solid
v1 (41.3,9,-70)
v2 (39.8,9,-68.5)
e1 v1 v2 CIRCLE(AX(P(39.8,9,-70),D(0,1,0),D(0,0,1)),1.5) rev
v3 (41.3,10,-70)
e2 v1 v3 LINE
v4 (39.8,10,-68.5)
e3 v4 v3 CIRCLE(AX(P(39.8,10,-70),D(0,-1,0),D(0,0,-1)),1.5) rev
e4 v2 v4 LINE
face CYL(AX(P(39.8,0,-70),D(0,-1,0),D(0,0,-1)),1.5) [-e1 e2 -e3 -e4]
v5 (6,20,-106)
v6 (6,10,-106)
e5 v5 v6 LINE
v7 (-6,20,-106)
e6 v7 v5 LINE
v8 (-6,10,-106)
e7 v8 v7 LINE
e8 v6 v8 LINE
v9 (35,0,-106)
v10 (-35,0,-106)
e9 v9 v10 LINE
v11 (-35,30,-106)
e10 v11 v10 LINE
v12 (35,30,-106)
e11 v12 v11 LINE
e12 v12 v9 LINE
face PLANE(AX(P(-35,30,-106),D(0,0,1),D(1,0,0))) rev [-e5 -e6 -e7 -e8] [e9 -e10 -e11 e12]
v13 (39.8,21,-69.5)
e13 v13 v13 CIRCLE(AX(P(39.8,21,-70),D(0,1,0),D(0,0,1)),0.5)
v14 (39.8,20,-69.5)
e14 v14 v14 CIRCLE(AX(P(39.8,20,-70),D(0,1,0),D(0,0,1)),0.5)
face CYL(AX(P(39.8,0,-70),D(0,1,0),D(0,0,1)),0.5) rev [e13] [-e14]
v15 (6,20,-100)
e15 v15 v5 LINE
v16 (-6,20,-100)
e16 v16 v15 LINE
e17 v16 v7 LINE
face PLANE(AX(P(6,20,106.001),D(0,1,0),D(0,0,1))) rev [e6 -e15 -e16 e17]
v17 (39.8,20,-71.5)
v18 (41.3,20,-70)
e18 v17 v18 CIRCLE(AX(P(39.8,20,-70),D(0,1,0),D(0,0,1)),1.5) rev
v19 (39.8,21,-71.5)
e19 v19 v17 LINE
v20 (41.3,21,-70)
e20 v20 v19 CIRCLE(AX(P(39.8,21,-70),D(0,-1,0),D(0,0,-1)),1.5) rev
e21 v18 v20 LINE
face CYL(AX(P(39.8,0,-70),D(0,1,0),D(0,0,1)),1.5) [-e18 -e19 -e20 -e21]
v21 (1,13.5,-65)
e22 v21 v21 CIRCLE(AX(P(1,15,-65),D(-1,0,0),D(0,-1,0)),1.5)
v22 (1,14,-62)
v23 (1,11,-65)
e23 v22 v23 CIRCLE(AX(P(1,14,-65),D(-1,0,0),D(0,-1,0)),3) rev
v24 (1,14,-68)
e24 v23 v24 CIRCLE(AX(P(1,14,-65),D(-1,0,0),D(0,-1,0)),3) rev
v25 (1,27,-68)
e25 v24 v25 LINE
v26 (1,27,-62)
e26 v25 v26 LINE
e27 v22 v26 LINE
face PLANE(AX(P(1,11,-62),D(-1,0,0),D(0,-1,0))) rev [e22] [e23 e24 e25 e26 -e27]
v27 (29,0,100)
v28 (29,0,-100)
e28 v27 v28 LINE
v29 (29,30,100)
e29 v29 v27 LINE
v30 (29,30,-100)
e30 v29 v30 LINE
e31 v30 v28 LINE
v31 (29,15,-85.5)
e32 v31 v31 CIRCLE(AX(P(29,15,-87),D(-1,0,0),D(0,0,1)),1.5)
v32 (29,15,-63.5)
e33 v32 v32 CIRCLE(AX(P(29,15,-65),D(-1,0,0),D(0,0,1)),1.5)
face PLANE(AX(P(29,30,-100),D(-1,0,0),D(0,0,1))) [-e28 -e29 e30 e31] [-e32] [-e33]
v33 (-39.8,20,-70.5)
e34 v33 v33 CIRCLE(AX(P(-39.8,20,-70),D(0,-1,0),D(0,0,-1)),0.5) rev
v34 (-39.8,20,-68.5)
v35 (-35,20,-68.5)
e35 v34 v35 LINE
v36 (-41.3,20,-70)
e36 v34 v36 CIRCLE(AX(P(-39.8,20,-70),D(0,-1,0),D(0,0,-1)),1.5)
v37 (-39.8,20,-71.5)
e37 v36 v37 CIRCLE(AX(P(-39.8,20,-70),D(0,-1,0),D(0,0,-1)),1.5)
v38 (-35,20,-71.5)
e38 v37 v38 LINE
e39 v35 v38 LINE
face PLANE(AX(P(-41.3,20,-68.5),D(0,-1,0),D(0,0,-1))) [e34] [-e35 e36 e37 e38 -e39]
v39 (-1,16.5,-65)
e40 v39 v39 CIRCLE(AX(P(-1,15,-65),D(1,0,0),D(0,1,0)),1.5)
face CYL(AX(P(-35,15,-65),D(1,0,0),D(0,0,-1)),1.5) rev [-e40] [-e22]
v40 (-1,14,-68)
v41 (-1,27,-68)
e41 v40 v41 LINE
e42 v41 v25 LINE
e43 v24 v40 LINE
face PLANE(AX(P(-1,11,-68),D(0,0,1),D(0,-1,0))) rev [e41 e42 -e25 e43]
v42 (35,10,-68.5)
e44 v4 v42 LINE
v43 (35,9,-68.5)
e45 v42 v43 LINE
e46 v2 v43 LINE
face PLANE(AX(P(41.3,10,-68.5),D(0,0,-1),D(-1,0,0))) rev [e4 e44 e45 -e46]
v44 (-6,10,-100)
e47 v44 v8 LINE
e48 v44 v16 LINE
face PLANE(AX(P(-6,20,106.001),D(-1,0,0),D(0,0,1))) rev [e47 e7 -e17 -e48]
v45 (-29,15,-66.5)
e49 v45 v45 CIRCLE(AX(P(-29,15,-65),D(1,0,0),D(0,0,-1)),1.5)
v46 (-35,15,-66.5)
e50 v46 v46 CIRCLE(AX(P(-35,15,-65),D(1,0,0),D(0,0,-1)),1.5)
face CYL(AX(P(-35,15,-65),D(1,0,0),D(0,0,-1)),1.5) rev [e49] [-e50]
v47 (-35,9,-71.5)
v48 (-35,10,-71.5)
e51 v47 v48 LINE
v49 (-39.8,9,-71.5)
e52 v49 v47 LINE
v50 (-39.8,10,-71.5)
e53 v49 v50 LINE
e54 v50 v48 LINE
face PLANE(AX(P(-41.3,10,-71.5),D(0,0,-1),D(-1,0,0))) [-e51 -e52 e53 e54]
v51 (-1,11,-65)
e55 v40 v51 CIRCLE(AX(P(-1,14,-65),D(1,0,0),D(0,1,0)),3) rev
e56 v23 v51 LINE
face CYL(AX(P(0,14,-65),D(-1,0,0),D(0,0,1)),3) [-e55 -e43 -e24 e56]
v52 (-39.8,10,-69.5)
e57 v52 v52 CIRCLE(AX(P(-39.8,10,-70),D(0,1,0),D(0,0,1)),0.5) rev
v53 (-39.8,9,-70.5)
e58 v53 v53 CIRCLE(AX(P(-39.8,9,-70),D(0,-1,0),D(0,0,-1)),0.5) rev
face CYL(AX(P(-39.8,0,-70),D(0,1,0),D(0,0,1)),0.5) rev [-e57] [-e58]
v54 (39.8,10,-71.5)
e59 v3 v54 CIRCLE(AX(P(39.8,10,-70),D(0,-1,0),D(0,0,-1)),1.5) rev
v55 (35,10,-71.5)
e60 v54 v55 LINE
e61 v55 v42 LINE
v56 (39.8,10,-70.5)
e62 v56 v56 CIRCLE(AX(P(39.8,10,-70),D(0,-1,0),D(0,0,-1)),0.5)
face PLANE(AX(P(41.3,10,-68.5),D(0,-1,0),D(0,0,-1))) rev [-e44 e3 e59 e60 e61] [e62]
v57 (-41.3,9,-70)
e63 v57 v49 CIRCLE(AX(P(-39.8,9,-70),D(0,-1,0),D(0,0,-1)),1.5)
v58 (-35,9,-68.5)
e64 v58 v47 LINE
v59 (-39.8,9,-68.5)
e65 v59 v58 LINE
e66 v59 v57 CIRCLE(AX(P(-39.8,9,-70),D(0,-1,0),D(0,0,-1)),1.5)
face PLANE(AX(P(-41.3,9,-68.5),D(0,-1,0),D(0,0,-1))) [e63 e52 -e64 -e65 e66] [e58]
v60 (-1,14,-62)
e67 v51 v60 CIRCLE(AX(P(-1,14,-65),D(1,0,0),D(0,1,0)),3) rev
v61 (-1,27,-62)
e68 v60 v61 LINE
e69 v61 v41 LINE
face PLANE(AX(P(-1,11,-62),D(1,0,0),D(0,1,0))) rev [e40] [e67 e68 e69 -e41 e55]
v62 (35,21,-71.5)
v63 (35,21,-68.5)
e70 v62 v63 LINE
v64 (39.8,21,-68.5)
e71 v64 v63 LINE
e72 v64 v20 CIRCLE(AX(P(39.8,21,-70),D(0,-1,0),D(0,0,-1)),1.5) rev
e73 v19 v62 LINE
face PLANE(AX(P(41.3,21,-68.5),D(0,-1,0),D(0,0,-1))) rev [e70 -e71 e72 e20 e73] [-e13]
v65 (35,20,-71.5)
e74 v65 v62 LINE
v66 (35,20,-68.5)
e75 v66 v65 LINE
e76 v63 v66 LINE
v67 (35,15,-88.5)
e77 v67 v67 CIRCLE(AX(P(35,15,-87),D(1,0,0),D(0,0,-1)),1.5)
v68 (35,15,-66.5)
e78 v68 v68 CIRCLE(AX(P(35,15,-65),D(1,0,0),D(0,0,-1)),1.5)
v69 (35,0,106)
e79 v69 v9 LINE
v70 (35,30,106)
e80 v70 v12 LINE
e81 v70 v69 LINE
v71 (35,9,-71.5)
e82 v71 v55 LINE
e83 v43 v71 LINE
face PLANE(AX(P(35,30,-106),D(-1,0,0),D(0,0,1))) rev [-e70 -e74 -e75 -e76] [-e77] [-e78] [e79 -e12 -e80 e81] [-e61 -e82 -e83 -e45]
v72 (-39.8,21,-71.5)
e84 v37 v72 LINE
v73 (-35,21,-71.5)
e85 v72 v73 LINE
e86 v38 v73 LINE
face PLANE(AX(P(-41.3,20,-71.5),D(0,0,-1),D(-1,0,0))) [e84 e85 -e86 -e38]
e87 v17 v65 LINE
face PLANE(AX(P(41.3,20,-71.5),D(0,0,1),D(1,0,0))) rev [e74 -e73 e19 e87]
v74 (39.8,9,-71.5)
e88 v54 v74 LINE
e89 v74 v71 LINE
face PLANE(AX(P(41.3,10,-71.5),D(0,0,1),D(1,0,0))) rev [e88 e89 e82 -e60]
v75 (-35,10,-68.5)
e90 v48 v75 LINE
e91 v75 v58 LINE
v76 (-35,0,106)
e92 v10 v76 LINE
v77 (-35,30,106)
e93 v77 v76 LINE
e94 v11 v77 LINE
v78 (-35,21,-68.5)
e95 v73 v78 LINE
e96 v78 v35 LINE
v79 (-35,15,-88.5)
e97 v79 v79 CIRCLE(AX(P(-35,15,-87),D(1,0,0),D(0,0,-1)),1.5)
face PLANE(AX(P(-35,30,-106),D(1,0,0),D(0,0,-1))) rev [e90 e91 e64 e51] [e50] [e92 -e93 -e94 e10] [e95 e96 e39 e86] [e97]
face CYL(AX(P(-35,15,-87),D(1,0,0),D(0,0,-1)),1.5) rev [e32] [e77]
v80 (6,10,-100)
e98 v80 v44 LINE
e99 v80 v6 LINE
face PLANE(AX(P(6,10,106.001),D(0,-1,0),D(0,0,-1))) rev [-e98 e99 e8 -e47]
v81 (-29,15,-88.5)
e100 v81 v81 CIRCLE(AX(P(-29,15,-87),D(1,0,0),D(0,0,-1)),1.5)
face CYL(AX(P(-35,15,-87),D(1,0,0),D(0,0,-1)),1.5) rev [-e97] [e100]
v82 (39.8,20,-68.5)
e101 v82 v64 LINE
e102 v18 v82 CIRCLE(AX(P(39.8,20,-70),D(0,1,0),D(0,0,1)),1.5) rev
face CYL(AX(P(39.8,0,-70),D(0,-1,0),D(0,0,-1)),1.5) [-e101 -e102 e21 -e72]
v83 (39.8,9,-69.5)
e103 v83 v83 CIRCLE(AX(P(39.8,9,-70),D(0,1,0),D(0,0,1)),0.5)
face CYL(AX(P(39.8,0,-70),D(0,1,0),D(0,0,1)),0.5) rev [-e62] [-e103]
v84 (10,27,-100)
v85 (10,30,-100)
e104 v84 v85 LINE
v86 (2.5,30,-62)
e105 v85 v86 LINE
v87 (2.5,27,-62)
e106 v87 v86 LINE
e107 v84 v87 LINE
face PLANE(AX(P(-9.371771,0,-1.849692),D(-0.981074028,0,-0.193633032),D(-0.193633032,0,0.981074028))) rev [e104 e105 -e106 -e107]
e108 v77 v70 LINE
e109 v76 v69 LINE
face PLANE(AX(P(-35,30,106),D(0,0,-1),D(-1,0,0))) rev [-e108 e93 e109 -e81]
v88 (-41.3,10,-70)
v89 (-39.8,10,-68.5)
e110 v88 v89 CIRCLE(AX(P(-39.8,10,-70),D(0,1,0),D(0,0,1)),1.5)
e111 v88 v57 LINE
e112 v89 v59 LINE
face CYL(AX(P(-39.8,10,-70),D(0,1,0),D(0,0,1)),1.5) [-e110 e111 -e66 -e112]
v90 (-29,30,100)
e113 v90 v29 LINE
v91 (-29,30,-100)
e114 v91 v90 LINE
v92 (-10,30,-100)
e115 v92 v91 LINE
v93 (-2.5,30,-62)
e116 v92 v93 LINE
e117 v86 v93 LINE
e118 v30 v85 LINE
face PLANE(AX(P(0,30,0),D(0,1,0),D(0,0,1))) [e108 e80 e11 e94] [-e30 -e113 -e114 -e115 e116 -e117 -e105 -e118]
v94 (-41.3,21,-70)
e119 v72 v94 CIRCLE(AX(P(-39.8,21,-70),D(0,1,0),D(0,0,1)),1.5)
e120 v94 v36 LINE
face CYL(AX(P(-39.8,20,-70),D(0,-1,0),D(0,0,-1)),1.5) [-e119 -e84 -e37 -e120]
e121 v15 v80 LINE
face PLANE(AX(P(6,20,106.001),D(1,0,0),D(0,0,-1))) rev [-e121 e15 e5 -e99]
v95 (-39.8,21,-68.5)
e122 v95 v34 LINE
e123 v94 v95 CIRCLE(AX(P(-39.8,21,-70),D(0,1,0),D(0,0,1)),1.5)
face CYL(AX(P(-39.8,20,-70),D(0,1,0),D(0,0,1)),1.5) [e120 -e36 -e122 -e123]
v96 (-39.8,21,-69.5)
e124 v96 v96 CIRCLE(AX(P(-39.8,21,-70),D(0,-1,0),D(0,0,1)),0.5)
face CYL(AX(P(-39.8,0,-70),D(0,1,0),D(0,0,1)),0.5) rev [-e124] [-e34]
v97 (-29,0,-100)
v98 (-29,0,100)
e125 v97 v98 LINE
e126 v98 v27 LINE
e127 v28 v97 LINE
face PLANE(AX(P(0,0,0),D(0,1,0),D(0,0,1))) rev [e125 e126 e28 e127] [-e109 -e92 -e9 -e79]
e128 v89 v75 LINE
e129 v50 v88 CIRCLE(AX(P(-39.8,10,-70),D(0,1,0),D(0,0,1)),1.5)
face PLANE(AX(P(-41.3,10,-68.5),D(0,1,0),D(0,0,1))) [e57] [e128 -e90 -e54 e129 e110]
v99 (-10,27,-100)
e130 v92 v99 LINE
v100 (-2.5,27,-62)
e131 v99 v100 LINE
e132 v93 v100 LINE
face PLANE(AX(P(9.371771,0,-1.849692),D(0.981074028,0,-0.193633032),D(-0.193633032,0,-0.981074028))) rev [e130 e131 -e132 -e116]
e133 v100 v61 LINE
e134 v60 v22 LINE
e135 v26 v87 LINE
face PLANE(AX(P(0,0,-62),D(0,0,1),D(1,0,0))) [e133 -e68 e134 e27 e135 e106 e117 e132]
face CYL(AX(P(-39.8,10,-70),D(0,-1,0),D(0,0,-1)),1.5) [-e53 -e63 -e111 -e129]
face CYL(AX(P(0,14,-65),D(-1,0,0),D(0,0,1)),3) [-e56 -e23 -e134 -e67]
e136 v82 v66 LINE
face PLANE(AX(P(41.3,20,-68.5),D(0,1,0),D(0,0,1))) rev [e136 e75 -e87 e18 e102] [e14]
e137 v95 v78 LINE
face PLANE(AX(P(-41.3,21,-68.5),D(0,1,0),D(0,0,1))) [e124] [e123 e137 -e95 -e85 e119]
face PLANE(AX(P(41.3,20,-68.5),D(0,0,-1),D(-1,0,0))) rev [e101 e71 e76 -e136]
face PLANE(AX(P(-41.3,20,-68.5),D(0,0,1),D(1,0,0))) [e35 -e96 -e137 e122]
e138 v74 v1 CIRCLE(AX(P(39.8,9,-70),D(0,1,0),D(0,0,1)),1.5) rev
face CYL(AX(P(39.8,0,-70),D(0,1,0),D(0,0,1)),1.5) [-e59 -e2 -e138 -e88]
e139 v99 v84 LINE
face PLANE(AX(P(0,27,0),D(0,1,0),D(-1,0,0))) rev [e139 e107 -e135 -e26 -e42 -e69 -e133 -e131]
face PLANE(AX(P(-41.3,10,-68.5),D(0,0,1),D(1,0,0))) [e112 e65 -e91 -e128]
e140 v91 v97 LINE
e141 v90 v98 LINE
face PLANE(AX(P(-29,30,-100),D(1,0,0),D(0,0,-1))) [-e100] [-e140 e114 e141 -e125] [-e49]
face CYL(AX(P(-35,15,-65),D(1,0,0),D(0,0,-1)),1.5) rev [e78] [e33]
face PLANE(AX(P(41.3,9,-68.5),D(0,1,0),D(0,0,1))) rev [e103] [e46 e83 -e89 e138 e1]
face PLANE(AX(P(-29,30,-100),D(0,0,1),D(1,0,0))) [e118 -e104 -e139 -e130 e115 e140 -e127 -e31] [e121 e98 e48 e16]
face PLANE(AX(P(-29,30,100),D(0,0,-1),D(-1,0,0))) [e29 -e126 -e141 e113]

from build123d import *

# Parameters (mm, degrees)
SKETCH1_W            = 70
SKETCH1_H            = 212
SKETCH1_W_2          = 58
SKETCH1_H_2          = 200
BOSS_EXTRUDE1_DEPTH  = 30
SKETCH10_W           = 2
SKETCH10_H           = 6
BOSS_EXTRUDE3_DEPTH  = 16
FILLET2_R            = 3
SKETCH2_R            = 1.5
CUT_EXTRUDE1_DEPTH   = 131.52202895
CUT_EXTRUDE2_REACH   = 218.954
SKETCH3_W            = 12
SKETCH3_H            = 10
SKETCH11_W           = 3
SKETCH11_H           = 1
BOSS_EXTRUDE4_DEPTH  = 6.3
FILLET3_R            = 1.5
SKETCH12_R           = 0.5
CUT_EXTRUDE3_DEPTH   = 116.683577146
FILLET3_OF_MIRROR1_R = 1.5


with BuildPart() as part:
    # Sketch1 → Boss-Extrude1 (new body)
    with BuildSketch(Plane(origin=(0, 0, 0), x_dir=(1, 0, 0), z_dir=(0, 1, 0))):
        Rectangle(SKETCH1_W, SKETCH1_H)
        Rectangle(SKETCH1_W_2, SKETCH1_H_2, mode=Mode.SUBTRACT)
    extrude(amount=BOSS_EXTRUDE1_DEPTH)

    # Sketch7 → Loft3 section 0
    with BuildSketch(Plane.XY.offset(-100)):
        with BuildLine():
            Line((-10, 30), (10, 30))
            Line((10, 30), (10, 27))
            Line((10, 27), (-10, 27))
            Line((-10, 27), (-10, 30))
        make_face()
    # Sketch8 → Loft3 section 1
    with BuildSketch(Plane.XY.offset(-62)):
        with BuildLine():
            Line((-2.5, 30), (2.5, 30))
            Line((2.5, 30), (2.5, 27))
            Line((2.5, 27), (-2.5, 27))
            Line((-2.5, 27), (-2.5, 30))
        make_face()
    loft()

    # Sketch10 → Boss-Extrude3 (add)
    with BuildSketch(Plane.XZ.offset(-27)):
        with Locations((0, -65)):
            Rectangle(SKETCH10_W, SKETCH10_H)
    extrude(amount=BOSS_EXTRUDE3_DEPTH)

    # Fillet2
    fillet2_edges = [part.edges().sort_by_distance(p)[0] for p in [
        (0, 11, -68),
        (0, 11, -62),
    ]]
    fillet(fillet2_edges, radius=FILLET2_R - 0.0001)  # a hair under: the kernel refuses the full size

    # Sketch2 → Cut-Extrude1 (cut, through all)
    with BuildSketch(Plane(origin=(35, 0, 0), x_dir=(0, 0, -1), z_dir=(1, 0, 0))):
        with Locations(Location((65, 15, 0), (0, 0, 270))):
            Circle(SKETCH2_R)
        with Locations((87, 15)):
            Circle(SKETCH2_R)
    extrude(amount=-CUT_EXTRUDE1_DEPTH, mode=Mode.SUBTRACT)

    # Sketch3 → Cut-Extrude2 (cut, up to next)
    with BuildSketch(Plane(origin=(0, 0, -106), x_dir=(-1, 0, 0), z_dir=(0, 0, -1)), mode=Mode.PRIVATE) as cut_extrude2_sk1:
        with Locations((0, 15)):
            Rectangle(SKETCH3_W, SKETCH3_H)
    cut_extrude2_tool1 = extrude(cut_extrude2_sk1.sketch, amount=-CUT_EXTRUDE2_REACH, mode=Mode.PRIVATE) & part.part
    add(cut_extrude2_tool1.solids().sort_by_distance((0, 15, -106))[0], mode=Mode.SUBTRACT)

    # Sketch11 → Boss-Extrude4 (add)
    with BuildSketch(Plane(origin=(35, 0, 0), x_dir=(0, 0, -1), z_dir=(1, 0, 0))):
        with Locations((70, 20.5)):
            Rectangle(SKETCH11_W, SKETCH11_H)
        with Locations((70, 9.5)):
            Rectangle(SKETCH11_W, SKETCH11_H)
    boss_extrude4 = extrude(amount=BOSS_EXTRUDE4_DEPTH)

    # Fillet3
    fillet3_edges = [part.edges().sort_by_distance(p)[0] for p in [
        (41.3, 9.5, -68.5),
        (41.3, 9.5, -71.5),
        (41.3, 20.5, -68.5),
        (41.3, 20.5, -71.5),
    ]]
    fillet(fillet3_edges, radius=FILLET3_R - 0.0001)  # a hair under: the kernel refuses the full size

    # Sketch12 → Cut-Extrude3 (cut, through all)
    with BuildSketch(Plane(origin=(0, 21, 0), x_dir=(1, 0, 0), z_dir=(0, 1, 0))):
        with Locations(Location((39.8, 70, 0), (0, 0, 270))):
            Circle(SKETCH12_R)
    cut_extrude3 = extrude(amount=-CUT_EXTRUDE3_DEPTH, mode=Mode.SUBTRACT)

    # Mirror1: Boss-Extrude4, Cut-Extrude3 across plane
    add(boss_extrude4.mirror(Plane(origin=(0, 0, 0), x_dir=(0, 0, 1), z_dir=(1, 0, 0))))
    add(cut_extrude3.mirror(Plane(origin=(0, 0, 0), x_dir=(0, 0, 1), z_dir=(1, 0, 0))), mode=Mode.SUBTRACT)

    # Fillet3 of Mirror1
    fillet3_of_mirror1_edges = [part.edges().sort_by_distance(p)[0] for p in [
        (-41.3, 9.5, -68.5),
        (-41.3, 9.5, -71.5),
        (-41.3, 20.5, -68.5),
        (-41.3, 20.5, -71.5),
    ]]
    fillet(fillet3_of_mirror1_edges, radius=FILLET3_OF_MIRROR1_R - 0.0001)  # a hair under: the kernel refuses the full size


solid = part.part
